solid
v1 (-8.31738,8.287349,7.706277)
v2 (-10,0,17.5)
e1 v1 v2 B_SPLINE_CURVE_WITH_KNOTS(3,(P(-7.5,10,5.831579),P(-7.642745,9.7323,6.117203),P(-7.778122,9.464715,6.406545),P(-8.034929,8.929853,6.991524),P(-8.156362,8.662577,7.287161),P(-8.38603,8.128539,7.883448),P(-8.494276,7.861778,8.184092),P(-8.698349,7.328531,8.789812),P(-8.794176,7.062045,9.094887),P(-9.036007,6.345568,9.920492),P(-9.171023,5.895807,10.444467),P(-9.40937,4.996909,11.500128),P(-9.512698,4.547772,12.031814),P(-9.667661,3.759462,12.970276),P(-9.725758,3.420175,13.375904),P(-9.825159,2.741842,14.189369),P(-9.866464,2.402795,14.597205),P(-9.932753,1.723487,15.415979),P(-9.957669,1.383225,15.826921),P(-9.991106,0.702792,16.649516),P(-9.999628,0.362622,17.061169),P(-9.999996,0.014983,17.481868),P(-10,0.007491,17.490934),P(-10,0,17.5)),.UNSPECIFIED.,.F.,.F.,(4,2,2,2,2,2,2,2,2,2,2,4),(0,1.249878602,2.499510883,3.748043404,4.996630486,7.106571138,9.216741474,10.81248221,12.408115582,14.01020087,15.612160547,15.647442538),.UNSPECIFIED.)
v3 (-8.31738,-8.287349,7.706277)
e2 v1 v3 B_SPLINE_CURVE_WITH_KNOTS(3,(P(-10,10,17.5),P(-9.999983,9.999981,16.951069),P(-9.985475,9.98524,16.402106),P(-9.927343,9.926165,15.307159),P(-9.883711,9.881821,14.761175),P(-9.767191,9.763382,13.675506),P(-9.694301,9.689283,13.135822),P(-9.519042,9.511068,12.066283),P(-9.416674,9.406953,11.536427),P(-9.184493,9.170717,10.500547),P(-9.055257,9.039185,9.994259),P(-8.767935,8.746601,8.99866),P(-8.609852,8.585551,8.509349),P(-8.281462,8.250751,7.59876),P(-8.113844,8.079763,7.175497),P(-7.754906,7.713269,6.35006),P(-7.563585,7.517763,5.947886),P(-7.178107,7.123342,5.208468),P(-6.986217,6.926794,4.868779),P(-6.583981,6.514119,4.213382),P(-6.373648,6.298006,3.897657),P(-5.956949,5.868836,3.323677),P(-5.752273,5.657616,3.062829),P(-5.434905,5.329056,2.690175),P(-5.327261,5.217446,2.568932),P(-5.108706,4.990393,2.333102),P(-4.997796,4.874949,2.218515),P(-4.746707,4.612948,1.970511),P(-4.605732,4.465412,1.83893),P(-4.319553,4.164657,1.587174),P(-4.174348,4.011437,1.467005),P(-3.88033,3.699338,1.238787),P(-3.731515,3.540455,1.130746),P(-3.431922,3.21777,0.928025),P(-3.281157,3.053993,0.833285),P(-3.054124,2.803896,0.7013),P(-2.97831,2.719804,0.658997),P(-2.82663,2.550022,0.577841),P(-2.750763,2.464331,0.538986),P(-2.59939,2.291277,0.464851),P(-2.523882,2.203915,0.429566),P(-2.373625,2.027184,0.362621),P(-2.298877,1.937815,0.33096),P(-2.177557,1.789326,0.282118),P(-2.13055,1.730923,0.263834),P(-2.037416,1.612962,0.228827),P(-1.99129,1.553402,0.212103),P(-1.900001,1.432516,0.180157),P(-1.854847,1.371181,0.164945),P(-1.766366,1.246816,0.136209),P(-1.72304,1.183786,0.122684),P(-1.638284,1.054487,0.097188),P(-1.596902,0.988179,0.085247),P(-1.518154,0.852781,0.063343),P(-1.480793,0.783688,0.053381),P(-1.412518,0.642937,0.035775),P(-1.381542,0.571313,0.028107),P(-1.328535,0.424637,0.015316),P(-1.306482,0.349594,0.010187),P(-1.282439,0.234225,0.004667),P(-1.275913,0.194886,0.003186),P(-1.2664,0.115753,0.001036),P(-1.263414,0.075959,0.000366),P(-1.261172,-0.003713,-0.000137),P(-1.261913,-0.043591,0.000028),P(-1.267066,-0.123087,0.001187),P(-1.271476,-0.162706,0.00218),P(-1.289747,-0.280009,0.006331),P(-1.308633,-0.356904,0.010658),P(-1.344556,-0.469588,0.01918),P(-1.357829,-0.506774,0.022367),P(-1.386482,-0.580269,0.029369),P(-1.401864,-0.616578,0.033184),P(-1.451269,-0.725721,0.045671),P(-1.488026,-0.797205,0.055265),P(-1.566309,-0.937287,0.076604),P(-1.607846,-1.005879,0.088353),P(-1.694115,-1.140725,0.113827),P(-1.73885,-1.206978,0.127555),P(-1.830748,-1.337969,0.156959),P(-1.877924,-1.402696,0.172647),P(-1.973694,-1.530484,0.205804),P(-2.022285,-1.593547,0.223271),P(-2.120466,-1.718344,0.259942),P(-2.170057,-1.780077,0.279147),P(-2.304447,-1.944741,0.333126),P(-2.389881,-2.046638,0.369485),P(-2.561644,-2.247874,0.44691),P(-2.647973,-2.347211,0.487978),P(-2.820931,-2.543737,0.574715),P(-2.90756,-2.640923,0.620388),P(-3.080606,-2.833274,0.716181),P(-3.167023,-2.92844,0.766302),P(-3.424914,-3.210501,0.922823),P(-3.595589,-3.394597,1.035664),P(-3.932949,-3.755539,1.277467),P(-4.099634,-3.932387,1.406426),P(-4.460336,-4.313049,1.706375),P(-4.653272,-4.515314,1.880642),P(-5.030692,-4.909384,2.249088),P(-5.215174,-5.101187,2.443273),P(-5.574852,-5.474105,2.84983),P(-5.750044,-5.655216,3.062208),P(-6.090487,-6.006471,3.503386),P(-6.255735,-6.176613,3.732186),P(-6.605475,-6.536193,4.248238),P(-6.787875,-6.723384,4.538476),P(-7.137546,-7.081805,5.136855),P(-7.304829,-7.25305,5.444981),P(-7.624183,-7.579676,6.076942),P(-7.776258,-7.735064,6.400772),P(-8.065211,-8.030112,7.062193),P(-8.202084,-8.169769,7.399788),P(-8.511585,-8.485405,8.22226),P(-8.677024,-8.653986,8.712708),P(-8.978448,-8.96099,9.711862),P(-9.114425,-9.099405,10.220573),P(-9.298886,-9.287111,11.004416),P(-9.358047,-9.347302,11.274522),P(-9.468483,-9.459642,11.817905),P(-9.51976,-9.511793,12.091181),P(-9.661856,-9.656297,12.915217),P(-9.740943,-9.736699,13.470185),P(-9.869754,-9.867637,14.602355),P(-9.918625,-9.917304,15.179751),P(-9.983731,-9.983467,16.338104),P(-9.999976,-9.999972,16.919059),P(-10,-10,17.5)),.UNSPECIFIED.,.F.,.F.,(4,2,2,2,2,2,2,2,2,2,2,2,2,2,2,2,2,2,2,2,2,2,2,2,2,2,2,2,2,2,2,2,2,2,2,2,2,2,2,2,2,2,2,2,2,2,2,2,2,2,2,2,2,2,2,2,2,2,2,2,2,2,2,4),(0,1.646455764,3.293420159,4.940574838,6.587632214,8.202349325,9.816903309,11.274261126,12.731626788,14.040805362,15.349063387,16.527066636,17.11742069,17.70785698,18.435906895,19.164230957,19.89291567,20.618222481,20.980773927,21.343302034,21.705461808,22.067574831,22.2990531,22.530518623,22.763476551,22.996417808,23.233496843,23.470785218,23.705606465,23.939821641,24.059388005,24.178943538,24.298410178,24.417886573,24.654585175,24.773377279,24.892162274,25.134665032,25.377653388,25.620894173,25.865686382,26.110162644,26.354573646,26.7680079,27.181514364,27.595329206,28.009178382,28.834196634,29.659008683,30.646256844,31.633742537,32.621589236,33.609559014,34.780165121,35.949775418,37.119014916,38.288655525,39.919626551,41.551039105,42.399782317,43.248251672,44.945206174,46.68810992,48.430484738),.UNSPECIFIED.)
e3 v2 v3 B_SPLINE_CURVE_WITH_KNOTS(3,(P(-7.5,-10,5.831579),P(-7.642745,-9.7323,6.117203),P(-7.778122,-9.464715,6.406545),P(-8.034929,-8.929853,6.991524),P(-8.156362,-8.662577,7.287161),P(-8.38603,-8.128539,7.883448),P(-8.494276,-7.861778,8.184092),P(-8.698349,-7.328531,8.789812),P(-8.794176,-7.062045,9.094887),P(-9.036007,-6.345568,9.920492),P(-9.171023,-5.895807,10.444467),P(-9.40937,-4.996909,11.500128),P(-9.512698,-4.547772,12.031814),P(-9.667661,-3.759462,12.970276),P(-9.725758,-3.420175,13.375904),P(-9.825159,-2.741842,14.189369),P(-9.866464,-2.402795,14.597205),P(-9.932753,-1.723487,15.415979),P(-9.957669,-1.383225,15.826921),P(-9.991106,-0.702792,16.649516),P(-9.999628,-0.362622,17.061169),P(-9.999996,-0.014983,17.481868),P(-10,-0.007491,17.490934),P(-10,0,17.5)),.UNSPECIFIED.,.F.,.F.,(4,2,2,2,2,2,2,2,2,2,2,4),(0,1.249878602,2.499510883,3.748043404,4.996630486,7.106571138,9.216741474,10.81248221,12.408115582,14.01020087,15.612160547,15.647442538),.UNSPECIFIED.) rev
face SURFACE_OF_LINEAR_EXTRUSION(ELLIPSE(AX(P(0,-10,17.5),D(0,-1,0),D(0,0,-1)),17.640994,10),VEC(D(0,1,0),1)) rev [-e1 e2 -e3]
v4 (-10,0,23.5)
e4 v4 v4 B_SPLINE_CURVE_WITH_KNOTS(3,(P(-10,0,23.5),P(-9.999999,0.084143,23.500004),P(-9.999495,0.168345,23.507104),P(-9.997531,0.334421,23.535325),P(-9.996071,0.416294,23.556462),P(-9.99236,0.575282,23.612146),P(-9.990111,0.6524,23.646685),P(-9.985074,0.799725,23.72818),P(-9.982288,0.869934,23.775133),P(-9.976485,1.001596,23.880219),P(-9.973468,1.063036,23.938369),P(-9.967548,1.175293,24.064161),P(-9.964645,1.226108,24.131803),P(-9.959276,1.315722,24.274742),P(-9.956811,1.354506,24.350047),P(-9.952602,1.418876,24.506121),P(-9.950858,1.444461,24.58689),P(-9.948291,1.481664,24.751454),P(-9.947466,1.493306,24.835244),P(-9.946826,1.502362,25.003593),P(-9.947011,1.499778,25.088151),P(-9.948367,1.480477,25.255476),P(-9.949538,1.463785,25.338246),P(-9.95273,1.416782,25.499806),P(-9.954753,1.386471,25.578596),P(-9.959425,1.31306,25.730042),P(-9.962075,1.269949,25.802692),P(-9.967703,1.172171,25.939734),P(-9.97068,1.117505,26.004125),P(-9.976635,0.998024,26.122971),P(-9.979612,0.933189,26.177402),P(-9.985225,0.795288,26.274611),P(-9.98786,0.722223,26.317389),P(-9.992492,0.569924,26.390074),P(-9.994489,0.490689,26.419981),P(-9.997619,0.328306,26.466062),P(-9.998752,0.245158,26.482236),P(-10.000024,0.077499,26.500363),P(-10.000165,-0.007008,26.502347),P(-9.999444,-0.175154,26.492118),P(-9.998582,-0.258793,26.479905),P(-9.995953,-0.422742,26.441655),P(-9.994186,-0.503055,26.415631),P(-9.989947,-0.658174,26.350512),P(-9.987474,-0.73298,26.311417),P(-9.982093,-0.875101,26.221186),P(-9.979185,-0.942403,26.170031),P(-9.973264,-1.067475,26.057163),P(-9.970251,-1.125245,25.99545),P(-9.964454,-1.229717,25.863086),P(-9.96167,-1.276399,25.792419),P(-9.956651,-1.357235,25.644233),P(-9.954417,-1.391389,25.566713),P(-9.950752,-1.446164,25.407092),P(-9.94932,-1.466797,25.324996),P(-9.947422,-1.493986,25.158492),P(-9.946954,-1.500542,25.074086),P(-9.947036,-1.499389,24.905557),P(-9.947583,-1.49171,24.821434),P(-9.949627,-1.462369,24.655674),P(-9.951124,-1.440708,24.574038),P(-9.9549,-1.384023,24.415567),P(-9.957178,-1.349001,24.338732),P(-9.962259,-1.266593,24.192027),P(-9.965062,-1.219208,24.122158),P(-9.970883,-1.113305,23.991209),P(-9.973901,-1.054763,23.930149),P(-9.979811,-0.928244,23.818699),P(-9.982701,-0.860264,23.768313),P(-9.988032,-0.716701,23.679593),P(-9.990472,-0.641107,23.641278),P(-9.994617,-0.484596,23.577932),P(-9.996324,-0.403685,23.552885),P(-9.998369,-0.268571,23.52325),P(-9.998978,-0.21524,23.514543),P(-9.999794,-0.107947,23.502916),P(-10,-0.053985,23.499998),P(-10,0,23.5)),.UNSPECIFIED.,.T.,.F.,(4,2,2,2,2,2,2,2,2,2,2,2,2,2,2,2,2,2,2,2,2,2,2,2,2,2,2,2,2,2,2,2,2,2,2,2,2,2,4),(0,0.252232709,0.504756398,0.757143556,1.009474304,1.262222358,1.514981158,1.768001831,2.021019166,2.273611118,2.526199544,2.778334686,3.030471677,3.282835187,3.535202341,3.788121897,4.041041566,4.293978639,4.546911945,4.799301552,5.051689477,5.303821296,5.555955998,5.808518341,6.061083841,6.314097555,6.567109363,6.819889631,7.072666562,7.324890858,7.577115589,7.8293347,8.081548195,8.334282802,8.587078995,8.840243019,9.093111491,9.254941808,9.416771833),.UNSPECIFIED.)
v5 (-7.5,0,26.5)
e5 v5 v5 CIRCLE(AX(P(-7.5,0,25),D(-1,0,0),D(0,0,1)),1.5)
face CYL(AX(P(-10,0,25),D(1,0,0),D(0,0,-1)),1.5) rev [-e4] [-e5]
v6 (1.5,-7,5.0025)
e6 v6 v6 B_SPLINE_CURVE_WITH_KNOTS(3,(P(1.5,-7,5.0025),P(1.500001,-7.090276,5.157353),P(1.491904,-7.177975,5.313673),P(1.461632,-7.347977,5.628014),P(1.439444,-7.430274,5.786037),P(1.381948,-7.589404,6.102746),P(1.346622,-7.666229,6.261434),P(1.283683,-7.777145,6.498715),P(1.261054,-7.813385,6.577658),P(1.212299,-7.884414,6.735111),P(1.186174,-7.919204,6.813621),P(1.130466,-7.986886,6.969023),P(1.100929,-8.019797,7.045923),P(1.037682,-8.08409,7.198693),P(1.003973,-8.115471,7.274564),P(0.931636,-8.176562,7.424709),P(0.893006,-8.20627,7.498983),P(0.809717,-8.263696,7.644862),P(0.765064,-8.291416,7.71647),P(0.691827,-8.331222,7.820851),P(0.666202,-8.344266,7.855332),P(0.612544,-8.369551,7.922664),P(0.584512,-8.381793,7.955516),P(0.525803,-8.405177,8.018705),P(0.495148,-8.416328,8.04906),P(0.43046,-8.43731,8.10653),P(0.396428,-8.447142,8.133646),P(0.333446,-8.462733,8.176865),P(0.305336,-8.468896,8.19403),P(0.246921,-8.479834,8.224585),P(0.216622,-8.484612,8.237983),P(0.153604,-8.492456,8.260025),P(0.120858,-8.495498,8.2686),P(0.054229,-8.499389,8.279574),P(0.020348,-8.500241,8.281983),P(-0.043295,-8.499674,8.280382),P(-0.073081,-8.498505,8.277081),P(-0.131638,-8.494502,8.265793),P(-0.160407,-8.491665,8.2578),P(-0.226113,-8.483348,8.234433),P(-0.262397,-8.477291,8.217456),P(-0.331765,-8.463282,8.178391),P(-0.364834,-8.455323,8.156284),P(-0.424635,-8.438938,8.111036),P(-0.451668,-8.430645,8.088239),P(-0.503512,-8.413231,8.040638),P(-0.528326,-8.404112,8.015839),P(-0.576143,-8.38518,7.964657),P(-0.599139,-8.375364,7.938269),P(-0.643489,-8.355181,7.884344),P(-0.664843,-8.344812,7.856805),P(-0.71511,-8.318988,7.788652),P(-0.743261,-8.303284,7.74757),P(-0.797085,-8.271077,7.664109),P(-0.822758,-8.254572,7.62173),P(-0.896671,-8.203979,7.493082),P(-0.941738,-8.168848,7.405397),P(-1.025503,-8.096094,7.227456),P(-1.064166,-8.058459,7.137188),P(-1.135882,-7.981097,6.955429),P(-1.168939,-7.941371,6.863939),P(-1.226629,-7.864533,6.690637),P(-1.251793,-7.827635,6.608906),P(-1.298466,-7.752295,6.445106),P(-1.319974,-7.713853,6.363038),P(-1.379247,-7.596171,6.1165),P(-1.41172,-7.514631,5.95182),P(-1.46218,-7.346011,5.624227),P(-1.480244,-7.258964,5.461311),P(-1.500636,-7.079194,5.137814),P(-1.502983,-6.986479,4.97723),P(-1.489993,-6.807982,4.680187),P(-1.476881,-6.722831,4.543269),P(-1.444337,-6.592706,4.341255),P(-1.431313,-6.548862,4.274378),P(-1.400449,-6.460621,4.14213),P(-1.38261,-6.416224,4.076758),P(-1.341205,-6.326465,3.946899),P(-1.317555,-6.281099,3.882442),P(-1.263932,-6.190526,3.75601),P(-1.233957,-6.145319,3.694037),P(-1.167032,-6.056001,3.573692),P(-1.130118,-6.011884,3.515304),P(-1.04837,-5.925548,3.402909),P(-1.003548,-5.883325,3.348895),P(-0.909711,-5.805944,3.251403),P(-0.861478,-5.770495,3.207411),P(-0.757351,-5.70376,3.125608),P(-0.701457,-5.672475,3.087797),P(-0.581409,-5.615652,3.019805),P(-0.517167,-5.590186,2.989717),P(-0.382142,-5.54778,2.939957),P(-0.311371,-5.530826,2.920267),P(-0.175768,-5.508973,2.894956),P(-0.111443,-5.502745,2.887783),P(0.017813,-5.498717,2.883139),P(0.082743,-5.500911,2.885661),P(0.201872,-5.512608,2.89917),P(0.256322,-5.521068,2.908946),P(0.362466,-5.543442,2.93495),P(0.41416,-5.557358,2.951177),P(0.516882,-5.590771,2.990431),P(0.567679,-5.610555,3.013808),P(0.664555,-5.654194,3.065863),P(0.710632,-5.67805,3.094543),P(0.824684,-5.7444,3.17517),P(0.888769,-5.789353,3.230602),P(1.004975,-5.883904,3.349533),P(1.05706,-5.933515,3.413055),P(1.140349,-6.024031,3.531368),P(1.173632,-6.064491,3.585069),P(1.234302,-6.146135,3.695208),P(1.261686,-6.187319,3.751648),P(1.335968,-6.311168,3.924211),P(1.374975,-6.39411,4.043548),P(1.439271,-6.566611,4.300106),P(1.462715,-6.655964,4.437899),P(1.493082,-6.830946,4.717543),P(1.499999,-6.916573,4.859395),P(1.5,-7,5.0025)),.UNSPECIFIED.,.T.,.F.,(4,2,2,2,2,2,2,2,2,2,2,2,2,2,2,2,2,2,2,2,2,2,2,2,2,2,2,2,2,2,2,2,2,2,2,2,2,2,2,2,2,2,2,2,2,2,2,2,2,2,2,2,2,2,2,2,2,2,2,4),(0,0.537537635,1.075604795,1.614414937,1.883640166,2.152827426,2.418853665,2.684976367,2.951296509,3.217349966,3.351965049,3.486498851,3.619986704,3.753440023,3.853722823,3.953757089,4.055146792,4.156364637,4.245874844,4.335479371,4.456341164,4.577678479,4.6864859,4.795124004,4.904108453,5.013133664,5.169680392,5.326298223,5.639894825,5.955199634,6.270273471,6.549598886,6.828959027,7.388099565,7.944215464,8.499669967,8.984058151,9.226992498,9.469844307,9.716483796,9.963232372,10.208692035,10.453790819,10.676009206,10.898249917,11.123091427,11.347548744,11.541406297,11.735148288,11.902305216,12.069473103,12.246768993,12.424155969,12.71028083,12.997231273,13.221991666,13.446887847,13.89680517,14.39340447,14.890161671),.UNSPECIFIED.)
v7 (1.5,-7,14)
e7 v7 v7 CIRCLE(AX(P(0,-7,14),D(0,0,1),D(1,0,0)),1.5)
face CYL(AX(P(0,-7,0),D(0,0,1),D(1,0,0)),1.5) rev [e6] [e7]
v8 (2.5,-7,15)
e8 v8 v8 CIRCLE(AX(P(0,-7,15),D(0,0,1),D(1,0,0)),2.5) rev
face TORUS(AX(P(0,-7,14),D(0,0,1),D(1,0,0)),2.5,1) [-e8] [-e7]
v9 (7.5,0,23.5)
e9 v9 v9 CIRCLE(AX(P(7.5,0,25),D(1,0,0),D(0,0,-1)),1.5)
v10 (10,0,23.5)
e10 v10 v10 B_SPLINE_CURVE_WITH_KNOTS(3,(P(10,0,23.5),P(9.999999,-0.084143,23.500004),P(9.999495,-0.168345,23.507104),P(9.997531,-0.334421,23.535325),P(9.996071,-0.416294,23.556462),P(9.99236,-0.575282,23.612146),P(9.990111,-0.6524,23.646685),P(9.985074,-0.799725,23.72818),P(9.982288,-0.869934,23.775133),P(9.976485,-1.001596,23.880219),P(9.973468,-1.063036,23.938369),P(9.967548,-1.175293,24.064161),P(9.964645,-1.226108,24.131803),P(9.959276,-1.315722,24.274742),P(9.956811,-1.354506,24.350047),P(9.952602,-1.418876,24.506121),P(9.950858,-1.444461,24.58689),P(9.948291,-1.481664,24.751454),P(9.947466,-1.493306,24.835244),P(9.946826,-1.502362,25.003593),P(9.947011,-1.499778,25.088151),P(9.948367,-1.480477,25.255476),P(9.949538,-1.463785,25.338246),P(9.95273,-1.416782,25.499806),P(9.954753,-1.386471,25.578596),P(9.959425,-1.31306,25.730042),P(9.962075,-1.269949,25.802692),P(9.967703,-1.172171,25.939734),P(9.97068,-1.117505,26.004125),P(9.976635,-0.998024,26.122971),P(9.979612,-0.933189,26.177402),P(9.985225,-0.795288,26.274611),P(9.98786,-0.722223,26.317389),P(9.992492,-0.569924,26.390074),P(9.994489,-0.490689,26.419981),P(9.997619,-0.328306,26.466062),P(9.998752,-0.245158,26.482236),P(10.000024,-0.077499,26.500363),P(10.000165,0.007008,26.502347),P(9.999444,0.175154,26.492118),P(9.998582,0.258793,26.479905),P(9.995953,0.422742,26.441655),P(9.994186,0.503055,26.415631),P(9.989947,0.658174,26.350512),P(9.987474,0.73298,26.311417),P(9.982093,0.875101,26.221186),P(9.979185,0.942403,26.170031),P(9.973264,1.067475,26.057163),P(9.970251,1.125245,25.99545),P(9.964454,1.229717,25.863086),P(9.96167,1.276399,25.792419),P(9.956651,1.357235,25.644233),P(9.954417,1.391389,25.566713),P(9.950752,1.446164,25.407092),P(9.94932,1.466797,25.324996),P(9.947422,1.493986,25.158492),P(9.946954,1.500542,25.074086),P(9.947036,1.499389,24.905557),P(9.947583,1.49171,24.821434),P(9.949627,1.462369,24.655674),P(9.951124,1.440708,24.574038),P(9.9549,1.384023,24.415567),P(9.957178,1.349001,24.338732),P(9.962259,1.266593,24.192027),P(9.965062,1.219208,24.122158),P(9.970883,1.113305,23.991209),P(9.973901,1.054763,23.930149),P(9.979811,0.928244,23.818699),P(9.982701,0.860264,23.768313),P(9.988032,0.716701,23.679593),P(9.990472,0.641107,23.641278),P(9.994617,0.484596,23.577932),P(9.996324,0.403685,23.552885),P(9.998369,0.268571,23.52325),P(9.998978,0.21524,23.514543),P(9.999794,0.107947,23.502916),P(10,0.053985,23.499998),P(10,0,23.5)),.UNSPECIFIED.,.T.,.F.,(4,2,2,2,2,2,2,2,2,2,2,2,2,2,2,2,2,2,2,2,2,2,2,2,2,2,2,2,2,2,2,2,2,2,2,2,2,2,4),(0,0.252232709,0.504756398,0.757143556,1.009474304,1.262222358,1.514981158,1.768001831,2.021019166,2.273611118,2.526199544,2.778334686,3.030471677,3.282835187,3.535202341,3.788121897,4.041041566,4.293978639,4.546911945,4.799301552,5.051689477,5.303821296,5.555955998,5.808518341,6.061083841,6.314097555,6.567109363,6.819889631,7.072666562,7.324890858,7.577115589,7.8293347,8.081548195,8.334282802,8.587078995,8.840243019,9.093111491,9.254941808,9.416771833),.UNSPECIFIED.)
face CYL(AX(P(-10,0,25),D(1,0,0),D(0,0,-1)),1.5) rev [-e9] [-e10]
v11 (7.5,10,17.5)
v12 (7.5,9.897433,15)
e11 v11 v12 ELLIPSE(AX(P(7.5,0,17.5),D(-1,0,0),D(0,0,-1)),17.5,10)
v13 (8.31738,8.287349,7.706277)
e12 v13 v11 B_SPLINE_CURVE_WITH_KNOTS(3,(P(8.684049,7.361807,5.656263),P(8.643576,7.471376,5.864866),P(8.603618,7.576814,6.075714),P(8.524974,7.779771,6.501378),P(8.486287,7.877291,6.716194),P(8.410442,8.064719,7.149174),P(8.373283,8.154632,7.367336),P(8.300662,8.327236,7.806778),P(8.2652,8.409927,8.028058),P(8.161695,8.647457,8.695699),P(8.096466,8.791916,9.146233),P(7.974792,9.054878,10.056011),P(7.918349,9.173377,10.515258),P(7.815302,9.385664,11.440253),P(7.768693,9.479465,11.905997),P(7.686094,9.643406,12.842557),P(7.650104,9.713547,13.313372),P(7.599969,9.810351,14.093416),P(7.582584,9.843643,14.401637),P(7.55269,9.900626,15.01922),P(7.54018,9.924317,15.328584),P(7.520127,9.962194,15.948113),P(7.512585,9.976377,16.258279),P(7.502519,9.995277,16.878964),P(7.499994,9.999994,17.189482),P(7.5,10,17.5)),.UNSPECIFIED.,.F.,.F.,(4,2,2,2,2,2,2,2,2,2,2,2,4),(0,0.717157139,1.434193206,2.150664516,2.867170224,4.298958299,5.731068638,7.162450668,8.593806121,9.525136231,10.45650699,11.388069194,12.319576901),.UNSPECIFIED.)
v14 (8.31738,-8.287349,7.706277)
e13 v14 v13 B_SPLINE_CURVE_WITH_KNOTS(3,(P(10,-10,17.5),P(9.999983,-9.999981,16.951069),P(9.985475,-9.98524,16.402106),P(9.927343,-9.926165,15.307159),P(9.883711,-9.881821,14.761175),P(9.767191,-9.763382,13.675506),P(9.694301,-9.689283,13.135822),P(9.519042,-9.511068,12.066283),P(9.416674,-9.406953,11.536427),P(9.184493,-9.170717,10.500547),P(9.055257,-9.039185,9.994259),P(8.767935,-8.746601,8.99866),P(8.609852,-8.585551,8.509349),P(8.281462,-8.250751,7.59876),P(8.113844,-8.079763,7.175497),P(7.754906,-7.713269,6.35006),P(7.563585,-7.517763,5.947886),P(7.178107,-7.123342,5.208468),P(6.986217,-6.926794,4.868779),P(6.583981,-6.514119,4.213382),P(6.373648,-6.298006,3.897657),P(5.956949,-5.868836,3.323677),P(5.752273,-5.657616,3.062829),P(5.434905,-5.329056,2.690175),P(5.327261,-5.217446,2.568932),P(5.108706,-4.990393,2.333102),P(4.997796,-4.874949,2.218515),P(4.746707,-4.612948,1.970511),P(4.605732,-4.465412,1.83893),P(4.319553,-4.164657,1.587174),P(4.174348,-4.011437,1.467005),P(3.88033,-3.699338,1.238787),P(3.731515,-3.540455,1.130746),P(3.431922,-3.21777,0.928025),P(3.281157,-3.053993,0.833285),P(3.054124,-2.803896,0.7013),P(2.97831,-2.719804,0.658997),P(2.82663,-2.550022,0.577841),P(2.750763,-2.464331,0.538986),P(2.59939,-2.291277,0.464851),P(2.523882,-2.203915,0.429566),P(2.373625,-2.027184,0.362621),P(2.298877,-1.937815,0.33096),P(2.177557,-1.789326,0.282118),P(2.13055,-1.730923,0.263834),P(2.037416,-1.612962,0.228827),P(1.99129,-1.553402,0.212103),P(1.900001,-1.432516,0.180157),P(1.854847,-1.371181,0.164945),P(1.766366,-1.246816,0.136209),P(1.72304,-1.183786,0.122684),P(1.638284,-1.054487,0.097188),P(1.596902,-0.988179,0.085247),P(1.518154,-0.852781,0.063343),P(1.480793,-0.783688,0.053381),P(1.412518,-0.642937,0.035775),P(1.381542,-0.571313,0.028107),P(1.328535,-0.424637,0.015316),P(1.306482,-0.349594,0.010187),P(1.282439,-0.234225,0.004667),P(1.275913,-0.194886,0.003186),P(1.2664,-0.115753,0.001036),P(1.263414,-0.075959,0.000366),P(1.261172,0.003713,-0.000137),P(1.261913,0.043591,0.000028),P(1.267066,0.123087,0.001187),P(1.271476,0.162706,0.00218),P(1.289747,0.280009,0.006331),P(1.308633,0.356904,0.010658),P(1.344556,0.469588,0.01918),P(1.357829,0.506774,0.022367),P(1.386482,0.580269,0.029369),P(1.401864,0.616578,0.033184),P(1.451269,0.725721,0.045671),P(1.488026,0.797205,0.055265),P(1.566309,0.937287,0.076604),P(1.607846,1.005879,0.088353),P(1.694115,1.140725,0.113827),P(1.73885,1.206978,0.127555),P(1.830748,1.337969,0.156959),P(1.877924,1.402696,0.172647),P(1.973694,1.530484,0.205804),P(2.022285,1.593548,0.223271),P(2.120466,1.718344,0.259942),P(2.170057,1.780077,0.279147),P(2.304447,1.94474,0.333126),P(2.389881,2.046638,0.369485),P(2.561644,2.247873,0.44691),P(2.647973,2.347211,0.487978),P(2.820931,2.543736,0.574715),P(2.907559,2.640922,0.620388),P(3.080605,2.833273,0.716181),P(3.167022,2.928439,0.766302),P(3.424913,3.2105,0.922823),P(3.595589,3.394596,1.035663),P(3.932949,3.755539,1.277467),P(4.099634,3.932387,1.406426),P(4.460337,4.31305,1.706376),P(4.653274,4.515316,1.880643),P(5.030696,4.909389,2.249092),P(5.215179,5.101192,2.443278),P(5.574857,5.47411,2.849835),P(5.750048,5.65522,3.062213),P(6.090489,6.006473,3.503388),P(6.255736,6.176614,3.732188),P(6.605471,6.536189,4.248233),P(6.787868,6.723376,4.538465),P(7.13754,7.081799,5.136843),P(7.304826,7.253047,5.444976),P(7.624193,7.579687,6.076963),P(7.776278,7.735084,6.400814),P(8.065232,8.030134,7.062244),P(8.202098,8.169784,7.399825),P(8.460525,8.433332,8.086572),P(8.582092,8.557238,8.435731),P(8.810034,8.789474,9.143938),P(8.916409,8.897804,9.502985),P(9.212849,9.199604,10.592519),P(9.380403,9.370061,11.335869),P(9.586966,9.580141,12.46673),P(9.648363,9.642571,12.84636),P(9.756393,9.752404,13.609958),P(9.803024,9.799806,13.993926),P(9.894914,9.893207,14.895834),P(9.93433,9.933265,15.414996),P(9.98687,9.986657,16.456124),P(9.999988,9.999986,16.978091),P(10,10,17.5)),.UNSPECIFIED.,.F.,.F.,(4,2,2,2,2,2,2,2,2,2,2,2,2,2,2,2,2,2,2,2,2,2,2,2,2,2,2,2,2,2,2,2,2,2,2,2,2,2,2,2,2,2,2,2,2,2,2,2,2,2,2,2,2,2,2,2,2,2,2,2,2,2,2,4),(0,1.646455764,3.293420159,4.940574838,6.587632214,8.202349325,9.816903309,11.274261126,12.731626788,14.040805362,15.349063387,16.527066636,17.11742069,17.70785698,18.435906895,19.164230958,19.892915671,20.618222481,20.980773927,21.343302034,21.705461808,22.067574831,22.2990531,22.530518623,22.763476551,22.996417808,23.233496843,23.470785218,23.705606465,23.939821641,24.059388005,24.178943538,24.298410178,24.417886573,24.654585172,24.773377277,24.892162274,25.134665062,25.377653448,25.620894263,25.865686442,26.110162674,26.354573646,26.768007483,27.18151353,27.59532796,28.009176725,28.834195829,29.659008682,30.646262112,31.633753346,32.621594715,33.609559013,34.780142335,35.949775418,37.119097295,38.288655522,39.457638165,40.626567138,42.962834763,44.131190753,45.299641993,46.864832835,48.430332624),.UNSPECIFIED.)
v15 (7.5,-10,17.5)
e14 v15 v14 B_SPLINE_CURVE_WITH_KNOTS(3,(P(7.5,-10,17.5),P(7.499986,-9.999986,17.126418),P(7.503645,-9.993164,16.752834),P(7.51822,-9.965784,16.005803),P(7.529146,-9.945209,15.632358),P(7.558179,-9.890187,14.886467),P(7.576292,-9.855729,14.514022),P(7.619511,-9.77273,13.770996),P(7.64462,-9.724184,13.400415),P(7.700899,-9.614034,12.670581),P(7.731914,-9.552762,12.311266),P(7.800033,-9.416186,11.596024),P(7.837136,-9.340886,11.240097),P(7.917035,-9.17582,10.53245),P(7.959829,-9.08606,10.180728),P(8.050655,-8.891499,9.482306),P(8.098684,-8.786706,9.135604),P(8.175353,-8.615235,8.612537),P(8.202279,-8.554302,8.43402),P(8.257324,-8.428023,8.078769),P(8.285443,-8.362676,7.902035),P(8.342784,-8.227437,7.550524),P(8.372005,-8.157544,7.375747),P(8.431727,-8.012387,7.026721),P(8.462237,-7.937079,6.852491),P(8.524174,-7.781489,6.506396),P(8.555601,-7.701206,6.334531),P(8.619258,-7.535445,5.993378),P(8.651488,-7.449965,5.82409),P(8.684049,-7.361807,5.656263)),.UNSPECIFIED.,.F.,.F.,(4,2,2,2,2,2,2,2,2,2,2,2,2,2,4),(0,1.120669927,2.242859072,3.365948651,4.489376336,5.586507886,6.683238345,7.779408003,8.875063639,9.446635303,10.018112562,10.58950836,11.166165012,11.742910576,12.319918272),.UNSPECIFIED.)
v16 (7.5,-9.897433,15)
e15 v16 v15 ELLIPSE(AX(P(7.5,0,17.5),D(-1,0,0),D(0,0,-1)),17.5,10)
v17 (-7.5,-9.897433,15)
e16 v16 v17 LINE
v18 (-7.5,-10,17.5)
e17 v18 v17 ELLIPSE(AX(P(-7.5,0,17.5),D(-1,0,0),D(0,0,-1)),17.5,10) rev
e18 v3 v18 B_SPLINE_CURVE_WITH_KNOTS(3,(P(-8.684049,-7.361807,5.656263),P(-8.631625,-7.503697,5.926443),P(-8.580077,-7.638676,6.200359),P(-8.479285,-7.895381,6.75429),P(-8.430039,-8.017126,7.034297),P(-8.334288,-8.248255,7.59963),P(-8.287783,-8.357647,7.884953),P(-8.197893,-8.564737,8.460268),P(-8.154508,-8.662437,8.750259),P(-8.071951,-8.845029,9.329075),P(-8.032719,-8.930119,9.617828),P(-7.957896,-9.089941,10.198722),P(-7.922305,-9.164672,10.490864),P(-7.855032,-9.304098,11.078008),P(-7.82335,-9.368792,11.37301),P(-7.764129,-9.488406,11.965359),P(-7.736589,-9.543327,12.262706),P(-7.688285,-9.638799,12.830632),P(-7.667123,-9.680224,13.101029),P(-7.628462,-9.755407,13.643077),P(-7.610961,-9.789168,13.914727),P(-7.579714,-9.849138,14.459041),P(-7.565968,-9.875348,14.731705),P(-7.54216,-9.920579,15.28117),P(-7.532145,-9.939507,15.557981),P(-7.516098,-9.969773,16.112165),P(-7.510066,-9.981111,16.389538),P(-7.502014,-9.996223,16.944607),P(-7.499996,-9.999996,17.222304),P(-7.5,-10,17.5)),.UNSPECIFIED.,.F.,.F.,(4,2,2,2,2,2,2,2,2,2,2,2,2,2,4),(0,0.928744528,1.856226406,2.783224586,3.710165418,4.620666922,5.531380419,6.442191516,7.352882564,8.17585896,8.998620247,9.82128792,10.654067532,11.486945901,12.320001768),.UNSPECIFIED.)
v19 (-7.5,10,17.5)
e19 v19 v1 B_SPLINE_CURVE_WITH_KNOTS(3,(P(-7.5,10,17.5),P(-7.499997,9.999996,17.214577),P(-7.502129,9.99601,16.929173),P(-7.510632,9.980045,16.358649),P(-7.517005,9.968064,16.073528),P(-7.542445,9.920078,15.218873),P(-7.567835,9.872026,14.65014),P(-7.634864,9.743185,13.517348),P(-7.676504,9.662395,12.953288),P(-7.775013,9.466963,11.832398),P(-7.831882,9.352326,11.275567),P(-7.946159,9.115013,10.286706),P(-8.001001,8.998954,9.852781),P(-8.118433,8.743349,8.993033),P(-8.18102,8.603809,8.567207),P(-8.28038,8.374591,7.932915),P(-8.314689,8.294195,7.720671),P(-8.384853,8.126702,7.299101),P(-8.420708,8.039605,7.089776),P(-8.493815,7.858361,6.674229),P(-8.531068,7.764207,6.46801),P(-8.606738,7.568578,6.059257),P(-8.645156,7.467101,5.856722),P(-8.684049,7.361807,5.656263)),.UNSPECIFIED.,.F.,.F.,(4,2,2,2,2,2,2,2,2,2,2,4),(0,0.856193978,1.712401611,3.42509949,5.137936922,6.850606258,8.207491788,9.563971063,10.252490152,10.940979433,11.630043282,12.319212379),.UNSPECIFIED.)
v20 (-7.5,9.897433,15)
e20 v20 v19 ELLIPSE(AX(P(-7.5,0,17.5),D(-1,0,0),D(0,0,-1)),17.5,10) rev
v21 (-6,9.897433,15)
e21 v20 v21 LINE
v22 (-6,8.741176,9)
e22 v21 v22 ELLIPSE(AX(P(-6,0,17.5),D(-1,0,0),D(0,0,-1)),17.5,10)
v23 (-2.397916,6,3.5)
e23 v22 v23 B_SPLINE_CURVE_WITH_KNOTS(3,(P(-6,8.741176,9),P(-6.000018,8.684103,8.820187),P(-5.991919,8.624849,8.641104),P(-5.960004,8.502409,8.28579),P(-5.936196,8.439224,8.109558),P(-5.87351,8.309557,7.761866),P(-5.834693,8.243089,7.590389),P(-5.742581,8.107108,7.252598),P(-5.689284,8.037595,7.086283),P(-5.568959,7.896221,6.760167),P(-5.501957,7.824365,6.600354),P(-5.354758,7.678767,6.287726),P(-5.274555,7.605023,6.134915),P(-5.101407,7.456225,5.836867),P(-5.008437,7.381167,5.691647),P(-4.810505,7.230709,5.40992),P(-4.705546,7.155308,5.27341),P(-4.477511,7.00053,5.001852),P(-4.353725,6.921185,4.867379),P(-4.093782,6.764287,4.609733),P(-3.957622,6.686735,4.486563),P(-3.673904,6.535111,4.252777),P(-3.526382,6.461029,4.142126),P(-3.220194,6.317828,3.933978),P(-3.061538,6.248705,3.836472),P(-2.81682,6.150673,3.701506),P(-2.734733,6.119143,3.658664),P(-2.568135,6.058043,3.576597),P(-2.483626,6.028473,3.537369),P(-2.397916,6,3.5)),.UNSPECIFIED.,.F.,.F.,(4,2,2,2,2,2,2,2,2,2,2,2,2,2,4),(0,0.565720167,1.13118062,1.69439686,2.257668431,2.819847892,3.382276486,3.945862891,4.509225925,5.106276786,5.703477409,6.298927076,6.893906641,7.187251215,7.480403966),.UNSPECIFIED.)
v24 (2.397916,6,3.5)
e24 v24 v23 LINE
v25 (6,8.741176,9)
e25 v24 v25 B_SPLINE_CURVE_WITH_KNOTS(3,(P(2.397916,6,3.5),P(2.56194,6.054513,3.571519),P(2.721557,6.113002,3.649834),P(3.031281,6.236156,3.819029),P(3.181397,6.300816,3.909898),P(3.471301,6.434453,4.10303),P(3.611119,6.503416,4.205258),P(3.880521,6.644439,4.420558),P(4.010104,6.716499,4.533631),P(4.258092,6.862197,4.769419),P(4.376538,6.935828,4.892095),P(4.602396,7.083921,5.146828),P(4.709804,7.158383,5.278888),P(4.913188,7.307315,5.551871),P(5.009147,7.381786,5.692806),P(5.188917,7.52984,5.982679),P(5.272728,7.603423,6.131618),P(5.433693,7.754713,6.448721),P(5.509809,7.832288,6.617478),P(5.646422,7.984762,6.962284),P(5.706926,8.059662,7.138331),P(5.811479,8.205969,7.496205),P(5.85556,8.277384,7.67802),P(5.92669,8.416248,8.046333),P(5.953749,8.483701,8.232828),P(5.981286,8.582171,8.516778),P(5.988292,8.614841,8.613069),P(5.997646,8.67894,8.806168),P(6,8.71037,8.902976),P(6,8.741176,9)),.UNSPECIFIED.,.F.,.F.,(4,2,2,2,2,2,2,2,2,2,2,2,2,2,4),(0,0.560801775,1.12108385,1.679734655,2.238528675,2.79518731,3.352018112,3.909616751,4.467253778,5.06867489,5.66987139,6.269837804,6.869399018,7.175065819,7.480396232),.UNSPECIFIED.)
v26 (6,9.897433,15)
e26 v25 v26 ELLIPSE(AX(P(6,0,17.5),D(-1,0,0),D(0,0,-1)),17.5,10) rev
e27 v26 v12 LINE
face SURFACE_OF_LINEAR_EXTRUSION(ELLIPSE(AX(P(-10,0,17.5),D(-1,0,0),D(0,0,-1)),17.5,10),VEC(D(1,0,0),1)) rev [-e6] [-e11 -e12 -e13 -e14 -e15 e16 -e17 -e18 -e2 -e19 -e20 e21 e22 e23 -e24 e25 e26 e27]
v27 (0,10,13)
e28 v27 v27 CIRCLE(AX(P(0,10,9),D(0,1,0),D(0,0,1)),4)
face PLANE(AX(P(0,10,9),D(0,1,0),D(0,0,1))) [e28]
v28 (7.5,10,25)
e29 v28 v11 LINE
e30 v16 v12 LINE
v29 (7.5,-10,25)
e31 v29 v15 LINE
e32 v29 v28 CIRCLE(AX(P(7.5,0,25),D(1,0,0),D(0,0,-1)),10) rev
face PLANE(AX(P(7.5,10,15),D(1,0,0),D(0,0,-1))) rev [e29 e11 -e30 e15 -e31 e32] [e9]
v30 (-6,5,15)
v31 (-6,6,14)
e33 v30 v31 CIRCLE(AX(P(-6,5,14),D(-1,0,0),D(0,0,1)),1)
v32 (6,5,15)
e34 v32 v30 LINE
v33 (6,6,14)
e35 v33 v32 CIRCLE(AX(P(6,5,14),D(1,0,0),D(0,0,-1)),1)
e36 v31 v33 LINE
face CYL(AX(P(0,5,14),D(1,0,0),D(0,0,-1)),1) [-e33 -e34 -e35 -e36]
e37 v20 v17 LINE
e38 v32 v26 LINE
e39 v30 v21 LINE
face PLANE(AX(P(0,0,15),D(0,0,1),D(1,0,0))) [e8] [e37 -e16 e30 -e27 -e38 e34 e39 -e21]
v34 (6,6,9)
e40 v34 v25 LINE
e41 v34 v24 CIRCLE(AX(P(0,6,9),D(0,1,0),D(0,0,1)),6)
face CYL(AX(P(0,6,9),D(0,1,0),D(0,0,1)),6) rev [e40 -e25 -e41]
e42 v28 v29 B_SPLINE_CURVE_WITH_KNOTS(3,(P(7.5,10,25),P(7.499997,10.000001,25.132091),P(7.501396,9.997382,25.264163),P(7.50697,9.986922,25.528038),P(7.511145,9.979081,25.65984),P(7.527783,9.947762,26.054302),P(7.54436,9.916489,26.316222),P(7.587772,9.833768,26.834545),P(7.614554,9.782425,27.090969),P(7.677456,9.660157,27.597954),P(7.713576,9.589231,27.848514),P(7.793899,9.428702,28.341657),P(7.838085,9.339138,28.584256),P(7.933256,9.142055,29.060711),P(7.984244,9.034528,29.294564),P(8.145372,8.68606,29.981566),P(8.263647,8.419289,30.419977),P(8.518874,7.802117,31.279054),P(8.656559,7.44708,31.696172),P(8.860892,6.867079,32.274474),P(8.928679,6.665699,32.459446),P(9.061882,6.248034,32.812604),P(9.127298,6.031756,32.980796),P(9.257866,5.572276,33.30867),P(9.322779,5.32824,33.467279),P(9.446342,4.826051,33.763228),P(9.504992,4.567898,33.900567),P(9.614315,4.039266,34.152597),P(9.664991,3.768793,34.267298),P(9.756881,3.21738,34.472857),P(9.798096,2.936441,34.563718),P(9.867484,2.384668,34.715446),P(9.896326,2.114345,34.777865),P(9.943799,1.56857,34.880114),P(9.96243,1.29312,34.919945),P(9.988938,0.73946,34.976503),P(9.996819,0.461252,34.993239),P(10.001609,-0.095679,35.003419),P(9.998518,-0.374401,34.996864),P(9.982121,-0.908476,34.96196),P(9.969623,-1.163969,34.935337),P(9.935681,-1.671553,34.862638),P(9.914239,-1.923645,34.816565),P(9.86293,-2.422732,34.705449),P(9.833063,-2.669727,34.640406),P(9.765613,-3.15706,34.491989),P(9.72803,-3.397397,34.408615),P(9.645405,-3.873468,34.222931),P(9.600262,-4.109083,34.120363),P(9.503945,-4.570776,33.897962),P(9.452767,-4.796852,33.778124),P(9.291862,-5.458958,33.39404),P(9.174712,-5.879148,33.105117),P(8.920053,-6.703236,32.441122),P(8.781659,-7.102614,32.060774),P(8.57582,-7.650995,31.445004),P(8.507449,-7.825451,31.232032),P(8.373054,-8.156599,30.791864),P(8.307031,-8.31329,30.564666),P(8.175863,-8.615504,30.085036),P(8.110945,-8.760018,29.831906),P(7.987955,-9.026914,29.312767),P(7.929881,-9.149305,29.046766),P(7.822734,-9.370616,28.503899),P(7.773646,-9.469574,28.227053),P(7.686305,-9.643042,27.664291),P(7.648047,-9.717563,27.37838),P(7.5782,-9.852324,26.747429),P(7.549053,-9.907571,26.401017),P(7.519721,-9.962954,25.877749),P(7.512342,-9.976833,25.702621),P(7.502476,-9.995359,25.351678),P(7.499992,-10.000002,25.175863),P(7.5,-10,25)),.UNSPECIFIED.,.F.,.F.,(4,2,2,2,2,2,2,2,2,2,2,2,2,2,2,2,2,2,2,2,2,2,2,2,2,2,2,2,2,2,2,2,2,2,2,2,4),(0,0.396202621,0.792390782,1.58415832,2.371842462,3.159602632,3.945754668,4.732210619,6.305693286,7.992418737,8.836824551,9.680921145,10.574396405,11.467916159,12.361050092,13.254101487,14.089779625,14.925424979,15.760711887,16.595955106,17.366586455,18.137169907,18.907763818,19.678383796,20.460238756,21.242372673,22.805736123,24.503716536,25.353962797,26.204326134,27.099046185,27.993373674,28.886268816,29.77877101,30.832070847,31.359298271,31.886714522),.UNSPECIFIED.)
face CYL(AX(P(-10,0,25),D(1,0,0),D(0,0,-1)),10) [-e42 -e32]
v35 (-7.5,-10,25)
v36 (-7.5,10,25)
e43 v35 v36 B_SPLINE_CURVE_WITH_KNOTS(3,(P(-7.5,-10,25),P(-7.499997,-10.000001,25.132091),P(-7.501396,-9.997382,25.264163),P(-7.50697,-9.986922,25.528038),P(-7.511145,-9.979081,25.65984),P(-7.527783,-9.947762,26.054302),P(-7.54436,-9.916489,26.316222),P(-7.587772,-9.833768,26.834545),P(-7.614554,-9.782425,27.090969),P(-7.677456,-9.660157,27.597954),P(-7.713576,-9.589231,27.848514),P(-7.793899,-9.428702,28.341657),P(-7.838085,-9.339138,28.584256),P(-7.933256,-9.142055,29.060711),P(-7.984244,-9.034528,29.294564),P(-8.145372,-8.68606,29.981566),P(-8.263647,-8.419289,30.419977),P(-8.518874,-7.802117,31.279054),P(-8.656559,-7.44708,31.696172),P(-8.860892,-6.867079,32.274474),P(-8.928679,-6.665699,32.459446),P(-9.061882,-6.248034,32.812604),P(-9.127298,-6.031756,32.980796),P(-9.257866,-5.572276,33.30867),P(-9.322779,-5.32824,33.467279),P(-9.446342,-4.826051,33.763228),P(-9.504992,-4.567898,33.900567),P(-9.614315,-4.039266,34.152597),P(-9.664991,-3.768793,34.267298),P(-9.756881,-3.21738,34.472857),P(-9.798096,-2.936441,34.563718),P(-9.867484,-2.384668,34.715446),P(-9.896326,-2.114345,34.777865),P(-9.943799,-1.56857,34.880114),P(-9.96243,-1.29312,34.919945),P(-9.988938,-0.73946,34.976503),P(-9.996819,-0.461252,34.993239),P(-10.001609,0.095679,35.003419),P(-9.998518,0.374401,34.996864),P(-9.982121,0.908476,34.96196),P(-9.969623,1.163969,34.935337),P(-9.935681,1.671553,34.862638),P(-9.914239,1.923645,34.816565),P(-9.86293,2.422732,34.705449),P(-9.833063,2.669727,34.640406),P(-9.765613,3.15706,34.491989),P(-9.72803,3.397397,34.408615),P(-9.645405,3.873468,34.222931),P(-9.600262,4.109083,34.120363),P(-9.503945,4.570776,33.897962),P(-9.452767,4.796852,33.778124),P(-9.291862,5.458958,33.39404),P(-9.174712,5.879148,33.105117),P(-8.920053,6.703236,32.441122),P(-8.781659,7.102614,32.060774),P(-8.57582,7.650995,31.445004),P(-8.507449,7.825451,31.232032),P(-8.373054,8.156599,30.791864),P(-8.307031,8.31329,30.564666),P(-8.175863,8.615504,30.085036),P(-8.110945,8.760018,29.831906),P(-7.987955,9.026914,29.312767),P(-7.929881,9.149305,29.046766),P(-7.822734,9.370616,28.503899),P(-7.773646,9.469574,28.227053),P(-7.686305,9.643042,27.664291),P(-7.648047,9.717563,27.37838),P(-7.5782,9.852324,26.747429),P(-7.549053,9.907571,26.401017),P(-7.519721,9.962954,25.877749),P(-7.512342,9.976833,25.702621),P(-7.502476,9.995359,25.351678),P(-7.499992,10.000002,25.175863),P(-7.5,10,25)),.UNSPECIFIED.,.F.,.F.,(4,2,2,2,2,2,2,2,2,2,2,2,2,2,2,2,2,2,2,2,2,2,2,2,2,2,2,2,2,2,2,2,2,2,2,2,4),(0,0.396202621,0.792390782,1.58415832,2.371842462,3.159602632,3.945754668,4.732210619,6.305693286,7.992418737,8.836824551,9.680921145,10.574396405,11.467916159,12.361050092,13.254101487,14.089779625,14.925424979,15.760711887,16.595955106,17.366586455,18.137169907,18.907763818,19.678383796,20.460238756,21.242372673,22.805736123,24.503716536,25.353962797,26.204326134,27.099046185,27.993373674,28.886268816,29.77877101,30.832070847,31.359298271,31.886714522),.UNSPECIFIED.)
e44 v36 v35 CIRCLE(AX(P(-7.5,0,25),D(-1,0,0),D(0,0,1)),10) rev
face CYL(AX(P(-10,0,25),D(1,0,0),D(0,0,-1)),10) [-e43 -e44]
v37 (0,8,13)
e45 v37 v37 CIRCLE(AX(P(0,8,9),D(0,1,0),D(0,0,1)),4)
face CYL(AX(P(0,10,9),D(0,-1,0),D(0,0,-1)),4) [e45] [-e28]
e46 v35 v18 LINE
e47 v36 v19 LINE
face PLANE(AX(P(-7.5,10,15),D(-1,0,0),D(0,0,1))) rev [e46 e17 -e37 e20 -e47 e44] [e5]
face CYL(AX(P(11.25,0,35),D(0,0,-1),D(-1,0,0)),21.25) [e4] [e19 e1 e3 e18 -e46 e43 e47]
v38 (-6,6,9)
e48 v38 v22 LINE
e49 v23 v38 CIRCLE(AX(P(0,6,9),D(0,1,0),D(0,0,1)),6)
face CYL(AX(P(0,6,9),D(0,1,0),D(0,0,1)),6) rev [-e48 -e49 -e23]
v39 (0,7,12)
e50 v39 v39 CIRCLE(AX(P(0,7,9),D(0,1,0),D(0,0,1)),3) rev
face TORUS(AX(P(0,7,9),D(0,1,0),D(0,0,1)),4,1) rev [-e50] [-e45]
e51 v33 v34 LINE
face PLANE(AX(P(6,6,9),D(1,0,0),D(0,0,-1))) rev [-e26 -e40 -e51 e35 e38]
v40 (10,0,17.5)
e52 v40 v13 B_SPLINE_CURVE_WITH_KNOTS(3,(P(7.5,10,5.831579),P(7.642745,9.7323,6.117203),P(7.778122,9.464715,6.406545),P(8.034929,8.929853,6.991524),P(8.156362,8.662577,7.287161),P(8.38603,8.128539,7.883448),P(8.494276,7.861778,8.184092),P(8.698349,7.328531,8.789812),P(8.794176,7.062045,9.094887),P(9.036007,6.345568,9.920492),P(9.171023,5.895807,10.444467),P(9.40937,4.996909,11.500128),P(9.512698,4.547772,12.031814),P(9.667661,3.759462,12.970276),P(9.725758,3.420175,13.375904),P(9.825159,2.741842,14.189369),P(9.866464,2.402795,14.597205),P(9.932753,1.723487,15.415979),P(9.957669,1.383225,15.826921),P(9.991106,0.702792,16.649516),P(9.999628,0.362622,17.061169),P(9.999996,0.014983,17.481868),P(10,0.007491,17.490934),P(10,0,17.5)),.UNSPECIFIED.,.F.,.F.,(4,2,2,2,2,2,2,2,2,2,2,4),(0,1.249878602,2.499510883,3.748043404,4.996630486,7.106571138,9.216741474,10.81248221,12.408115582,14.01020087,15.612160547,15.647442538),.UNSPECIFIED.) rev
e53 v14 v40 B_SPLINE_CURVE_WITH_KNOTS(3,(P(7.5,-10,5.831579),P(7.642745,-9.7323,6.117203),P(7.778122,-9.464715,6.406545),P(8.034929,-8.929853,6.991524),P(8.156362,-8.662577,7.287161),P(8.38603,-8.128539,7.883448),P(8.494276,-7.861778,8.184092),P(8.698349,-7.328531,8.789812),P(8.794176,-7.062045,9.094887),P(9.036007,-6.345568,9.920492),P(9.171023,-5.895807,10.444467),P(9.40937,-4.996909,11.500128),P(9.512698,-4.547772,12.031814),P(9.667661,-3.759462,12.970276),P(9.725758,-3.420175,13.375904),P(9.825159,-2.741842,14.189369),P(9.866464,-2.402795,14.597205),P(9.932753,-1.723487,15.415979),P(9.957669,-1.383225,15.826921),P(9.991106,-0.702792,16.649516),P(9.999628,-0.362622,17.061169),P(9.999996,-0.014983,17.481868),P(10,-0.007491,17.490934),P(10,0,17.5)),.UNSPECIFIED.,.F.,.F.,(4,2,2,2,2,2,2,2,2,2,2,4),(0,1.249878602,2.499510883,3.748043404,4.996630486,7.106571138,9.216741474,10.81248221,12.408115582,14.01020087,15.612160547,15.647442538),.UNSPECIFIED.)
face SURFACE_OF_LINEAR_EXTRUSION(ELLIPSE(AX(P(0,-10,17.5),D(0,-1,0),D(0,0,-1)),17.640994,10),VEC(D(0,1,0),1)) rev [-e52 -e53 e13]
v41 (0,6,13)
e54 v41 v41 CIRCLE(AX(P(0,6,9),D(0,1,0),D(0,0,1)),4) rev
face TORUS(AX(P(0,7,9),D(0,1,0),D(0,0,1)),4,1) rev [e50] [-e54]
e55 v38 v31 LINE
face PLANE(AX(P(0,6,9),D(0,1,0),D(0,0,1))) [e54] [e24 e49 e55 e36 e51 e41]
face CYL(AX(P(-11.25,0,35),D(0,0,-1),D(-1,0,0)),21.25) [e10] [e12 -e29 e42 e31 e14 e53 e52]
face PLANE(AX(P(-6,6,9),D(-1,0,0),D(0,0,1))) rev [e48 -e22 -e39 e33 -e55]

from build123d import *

# Parameters (mm, degrees)
SALIENTE_EXTRUIR1_DEPTH    = 35
CROQUIS3_R                 = 1.5
CORTAR_EXTRUIR2_DEPTH      = 38.749172176
CROQUIS6_W                 = 15
CROQUIS6_H                 = 20
CORTAR_EXTRUIR4_DEPTH      = 20
CORTAR_EXTRUIR5_DEPTH      = 38.749172176
CORTAR_EXTRUIR5_DEPTH_BACK = 38.749172176
CROQUIS7_R                 = 1.5
CORTAR_EXTRUIR1_DEPTH      = 38.749172328
CORTAR_EXTRUIR1_DEPTH_BACK = 38.749172328
CORTAR_EXTRUIR3_DEPTH      = 38.749172461
CORTAR_EXTRUIR3_DEPTH_BACK = 38.749172461
CUT_EXTRUDE1_DEPTH         = 4
SKETCH2_R                  = 3
BOSS_EXTRUDE1_DEPTH        = 2
SKETCH3_R                  = 4
BOSS_EXTRUDE2_DEPTH        = 2
FILLET1_R                  = 1
FILLET2_R                  = 1
FILLET4_R                  = 1


with BuildPart() as part:
    # Croquis1 → Saliente-Extruir1 (new body)
    with BuildSketch(Plane.XY):
        with BuildLine():
            Line((-7.5, 10), (7.5, 10))
            ThreePointArc((7.5, 10), (10, 0), (7.5, -10))
            Line((7.5, -10), (-7.5, -10))
            ThreePointArc((-7.5, -10), (-10, 0), (-7.5, 10))
        make_face()
    extrude(amount=SALIENTE_EXTRUIR1_DEPTH)

    # Croquis3 → Cortar-Extruir2 (cut, through all)
    with BuildSketch(Plane.XY.offset(35)):
        with Locations((0, -7)):
            Circle(CROQUIS3_R)
    extrude(amount=-CORTAR_EXTRUIR2_DEPTH, mode=Mode.SUBTRACT)

    # Croquis6 → Cortar-Extruir4 (cut)
    with BuildSketch(Plane.XY.offset(35)):
        Rectangle(CROQUIS6_W, CROQUIS6_H)
    extrude(amount=-CORTAR_EXTRUIR4_DEPTH, mode=Mode.SUBTRACT)

    # Croquis7 → Cortar-Extruir5 (cut, two sides: drawn at the far end of the back side and taken through both)
    with BuildSketch(Plane(origin=(0, 0, 0), x_dir=(0, 0, -1), z_dir=(1, 0, 0)).offset(-CORTAR_EXTRUIR5_DEPTH_BACK)):
        with Locations((-25, 0)):
            Circle(CROQUIS7_R)
        with BuildLine():
            Line((-25, -10), (-41, -10))
            Line((-41, -10), (-41, 10))
            Line((-41, 10), (-25, 10))
            ThreePointArc((-25, 10), (-35, 0), (-25, -10))
        make_face()
    extrude(amount=CORTAR_EXTRUIR5_DEPTH + CORTAR_EXTRUIR5_DEPTH_BACK, mode=Mode.SUBTRACT)

    # Croquis2 → Cortar-Extruir1 (cut, two sides: drawn at the far end of the back side and taken through both)
    with BuildSketch(Plane(origin=(0, 0, 0), x_dir=(1, 0, 0), z_dir=(0, 1, 0)).offset(-CORTAR_EXTRUIR1_DEPTH_BACK)):
        with BuildLine():
            Line((-1.261783996, 0), (1.261783996, 0))
            add(Edge.make_bspline(
                [(10, -17.5), (10, -1.960721315), (1.261783996, 0)],
                knots=[4.71238898, 4.71238898, 4.71238898, 6.156669672, 6.156669672, 6.156669672], degree=2, weights=[1, 0.750392697, 1]))
            Line((10, -17.5), (10, 3.270111557))
            Line((10, 3.270111557), (-10, 3.270111557))
            Line((-10, 3.270111557), (-10, -17.5))
            add(Edge.make_bspline(
                [(-1.261783996, 0), (-10, -1.960721315), (-10, -17.5)],
                knots=[0.126515635, 0.126515635, 0.126515635, 1.570796327, 1.570796327, 1.570796327], degree=2, weights=[1, 0.750392697, 1]))
        make_face()
    extrude(amount=CORTAR_EXTRUIR1_DEPTH + CORTAR_EXTRUIR1_DEPTH_BACK, mode=Mode.SUBTRACT)

    # Croquis5 → Cortar-Extruir3 (cut, two sides: drawn at the far end of the back side and taken through both)
    with BuildSketch(Plane(origin=(0, 0, 0), x_dir=(0, 0, -1), z_dir=(1, 0, 0)).offset(-CORTAR_EXTRUIR3_DEPTH_BACK)):
        with BuildLine():
            Line((-17.5, -10), (6.249957369, -10))
            Line((6.249957369, -10), (6.249957369, 10))
            Line((6.249957369, 10), (-17.5, 10))
            add(Edge.make_bspline(
                [(-17.5, -10), (0, -10), (0, 0), (0, 10), (-17.5, 10)],
                knots=[4.71238898, 4.71238898, 4.71238898, 6.283185307, 6.283185307, 7.853981634, 7.853981634, 7.853981634], degree=2, weights=[1, 0.707106781, 1, 0.707106781, 1]))
        make_face()
    extrude(amount=CORTAR_EXTRUIR3_DEPTH + CORTAR_EXTRUIR3_DEPTH_BACK, mode=Mode.SUBTRACT)

    # Sketch1 → Cut-Extrude1 (cut)
    with BuildSketch(Plane(origin=(0, 10, 0), x_dir=(1, 0, 0), z_dir=(0, 1, 0))):
        with BuildLine():
            Line((-6, -9), (-6, -15))
            Line((-6, -15), (6, -15))
            Line((6, -15), (6, -9))
            ThreePointArc((6, -9), (0, -3), (-6, -9))
        make_face()
    extrude(amount=-CUT_EXTRUDE1_DEPTH, mode=Mode.SUBTRACT)

    # Sketch2 → Boss-Extrude1 (add)
    with BuildSketch(Plane(origin=(0, 6, 0), x_dir=(1, 0, 0), z_dir=(0, 1, 0))):
        with Locations(Location((0, -9, 0), (0, 0, 270))):
            Circle(SKETCH2_R)
    extrude(amount=BOSS_EXTRUDE1_DEPTH)

    # Sketch3 → Boss-Extrude2 (add)
    with BuildSketch(Plane(origin=(0, 8, 0), x_dir=(1, 0, 0), z_dir=(0, 1, 0))):
        with Locations(Location((0, -9, 0), (0, 0, 270))):
            Circle(SKETCH3_R)
    extrude(amount=BOSS_EXTRUDE2_DEPTH)

    # Fillet1
    fillet1_edges = [part.edges().sort_by_distance(p)[0] for p in [
        (0, 6, 6),
        (0, 8, 6),
    ]]
    fillet(fillet1_edges, radius=FILLET1_R - 0.0001)  # a hair under: the kernel refuses the full size

    # Fillet2
    fillet2_edges = [part.edges().sort_by_distance(p)[0] for p in [
        (0, 6, 15),
    ]]
    fillet(fillet2_edges, radius=FILLET2_R)

    # Fillet4
    fillet4_edges = [part.edges().sort_by_distance(p)[0] for p in [
        (-1.5, -7, 15),
    ]]
    fillet(fillet4_edges, radius=FILLET4_R)


solid = part.part
